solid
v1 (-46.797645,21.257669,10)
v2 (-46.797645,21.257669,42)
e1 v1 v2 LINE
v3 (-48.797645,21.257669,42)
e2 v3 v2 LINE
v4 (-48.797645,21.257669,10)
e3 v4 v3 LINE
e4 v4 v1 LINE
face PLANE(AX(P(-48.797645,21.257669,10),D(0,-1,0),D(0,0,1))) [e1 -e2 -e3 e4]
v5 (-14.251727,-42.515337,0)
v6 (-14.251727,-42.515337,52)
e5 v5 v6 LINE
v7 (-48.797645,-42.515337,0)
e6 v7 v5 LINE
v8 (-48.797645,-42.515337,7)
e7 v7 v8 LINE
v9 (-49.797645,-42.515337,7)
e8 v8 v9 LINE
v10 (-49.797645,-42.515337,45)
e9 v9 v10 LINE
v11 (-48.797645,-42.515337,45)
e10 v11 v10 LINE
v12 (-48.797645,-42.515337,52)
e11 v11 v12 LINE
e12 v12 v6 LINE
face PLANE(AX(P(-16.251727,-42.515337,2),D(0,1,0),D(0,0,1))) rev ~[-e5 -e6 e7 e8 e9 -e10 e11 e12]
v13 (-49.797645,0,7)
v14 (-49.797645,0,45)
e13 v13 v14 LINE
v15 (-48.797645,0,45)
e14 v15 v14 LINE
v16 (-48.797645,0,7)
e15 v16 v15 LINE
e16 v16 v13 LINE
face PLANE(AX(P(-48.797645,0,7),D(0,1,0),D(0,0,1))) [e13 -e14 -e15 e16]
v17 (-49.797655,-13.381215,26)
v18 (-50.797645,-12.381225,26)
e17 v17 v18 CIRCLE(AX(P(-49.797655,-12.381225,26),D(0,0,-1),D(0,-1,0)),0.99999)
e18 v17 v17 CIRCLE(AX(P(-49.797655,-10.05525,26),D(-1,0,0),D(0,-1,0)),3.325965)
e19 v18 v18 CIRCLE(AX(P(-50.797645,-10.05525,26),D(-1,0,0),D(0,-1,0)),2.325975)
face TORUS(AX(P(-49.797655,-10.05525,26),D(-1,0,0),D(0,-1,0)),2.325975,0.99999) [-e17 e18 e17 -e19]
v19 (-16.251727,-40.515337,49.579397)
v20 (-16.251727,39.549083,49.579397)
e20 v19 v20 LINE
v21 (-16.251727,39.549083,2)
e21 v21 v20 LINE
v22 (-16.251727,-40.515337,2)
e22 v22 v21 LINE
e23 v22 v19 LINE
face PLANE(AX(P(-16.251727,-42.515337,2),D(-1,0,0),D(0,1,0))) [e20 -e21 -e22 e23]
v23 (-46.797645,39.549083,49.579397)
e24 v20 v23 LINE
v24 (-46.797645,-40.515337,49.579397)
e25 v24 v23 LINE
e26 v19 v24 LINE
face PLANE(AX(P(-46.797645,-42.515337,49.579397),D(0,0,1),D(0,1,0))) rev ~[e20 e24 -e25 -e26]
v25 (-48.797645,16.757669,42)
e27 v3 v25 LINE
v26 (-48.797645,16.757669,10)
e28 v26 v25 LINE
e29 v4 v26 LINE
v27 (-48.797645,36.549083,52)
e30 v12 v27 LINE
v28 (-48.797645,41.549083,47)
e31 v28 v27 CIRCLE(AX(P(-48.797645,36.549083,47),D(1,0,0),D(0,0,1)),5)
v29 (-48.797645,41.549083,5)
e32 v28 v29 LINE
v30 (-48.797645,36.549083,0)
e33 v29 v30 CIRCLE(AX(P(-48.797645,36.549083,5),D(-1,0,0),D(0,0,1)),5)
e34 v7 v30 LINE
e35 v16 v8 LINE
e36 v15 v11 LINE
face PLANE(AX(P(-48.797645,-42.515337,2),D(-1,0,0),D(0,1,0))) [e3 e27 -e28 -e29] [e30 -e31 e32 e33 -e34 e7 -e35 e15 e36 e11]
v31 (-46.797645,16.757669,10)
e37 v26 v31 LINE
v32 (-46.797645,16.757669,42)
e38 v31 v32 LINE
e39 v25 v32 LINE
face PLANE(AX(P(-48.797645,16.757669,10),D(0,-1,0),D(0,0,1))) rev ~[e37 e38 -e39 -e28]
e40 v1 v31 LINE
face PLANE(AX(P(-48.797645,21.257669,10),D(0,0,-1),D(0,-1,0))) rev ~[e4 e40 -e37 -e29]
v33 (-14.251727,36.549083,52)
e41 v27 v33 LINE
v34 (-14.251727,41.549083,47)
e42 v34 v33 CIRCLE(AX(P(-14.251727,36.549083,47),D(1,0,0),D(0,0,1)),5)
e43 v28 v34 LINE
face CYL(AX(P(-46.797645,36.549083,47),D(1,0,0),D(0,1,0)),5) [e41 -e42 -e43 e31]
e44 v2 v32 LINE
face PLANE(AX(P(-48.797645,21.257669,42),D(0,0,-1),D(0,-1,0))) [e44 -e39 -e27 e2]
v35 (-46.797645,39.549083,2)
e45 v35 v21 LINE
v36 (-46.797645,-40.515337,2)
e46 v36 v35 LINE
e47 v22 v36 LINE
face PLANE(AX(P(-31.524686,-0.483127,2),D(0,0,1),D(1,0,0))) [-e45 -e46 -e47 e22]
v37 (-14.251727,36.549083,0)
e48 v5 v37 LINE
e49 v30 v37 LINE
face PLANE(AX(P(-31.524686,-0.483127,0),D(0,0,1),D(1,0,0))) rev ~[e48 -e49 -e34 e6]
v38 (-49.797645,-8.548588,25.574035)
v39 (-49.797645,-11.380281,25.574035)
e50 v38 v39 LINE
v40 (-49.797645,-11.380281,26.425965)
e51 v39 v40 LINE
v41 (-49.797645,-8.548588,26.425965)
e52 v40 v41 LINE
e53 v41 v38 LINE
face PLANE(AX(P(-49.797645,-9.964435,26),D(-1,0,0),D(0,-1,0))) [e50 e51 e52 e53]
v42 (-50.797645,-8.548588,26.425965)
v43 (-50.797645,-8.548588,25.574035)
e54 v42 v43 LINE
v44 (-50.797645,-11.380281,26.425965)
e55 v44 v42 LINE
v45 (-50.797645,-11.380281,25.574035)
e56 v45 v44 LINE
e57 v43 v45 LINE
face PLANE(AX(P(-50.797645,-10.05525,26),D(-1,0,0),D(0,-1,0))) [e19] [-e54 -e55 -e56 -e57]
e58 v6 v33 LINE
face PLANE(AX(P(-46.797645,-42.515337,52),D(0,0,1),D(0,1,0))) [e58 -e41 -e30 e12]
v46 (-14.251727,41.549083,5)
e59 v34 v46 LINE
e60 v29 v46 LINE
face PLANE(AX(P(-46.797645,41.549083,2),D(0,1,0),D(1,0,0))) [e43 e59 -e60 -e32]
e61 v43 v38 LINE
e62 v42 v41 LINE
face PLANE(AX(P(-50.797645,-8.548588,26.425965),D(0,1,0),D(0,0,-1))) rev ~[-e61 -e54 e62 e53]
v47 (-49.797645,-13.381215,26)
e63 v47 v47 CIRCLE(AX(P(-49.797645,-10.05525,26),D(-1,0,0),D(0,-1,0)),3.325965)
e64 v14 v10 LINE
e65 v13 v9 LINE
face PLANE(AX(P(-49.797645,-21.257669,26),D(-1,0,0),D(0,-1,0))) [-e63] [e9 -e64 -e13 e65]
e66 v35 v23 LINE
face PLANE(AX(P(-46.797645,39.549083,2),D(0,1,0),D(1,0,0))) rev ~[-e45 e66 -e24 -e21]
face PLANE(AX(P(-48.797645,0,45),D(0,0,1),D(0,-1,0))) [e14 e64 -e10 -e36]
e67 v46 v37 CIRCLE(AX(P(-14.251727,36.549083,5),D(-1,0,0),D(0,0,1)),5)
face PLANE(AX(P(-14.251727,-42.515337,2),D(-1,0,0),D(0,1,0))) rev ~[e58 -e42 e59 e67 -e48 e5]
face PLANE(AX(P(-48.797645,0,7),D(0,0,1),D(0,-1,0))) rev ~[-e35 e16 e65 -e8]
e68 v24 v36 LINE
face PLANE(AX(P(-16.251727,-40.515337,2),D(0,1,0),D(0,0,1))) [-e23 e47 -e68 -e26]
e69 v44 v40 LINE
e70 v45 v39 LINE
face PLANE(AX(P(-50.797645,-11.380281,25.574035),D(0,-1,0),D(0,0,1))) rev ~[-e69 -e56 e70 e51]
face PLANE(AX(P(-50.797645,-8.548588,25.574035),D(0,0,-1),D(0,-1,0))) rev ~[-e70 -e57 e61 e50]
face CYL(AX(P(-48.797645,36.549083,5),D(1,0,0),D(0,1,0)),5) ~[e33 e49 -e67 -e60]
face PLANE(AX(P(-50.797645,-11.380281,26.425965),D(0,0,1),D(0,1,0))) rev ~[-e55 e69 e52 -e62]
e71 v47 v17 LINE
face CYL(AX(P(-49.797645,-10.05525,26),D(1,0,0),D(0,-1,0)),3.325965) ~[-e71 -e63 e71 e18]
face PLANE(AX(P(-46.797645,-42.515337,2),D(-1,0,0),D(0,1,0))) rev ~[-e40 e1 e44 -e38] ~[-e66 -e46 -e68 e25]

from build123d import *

# Parameters (mm, degrees)
F0_W      = 34.5459179953
F0_H      = 84.0644203126
F1_DEPTH  = 2
F2_W      = 2
F2_H      = 84.0644203126
F3_DEPTH  = 50
F4_W      = 2
F4_H      = 84.0644203126
F5_DEPTH  = 50
F6_W      = 84.0644203126
F6_H      = 2.4206031561
F7_DEPTH  = 32.2
F8_W      = 30.5459179953
F8_H      = 2
F9_DEPTH  = 47.6
F10_R     = 5
F11_R     = 5
F12_W     = 2
F12_H     = 47.5793968439
F13_DEPTH = 31.3
F14_W     = 4.5
F14_H     = 32
F15_DEPTH = 25
F16_W     = 42.5153374672
F16_H     = 38
F17_DEPTH = 1
F18_R     = 3.3259647968
F19_DEPTH = 1
F20_R     = 0.99999
F22_DEPTH = 1


# Not quite as in the source:
# - a fillet or chamfer is up to 0.001 mm smaller than in the source, because OpenCascade refuses the exact size


with BuildPart() as f1:
    # F0 (on Top) → F1 (new body)
    with BuildSketch(Plane.XY):
        with Locations((-31.5246856771, -0.4831273109)):
            Rectangle(F0_W, F0_H)
    extrude(amount=F1_DEPTH)

    # F2 (on face) → F3 (join)
    with BuildSketch(Plane.XY.offset(2)):
        with Locations((-15.2517266795, -0.4831273109)):
            Rectangle(F2_W, F2_H)
    extrude(amount=F3_DEPTH)

    # F4 (on face) → F5 (join)
    with BuildSketch(Plane.XY.offset(2)):
        with Locations((-47.7976446748, -0.4831273109)):
            Rectangle(F4_W, F4_H)
    extrude(amount=F5_DEPTH)

    # F6 (on face) → F7 (join)
    with BuildSketch(Plane.YZ.offset(-46.7976446748)):
        with Locations((-0.4831273109, 50.789698422)):
            Rectangle(F6_W, F6_H)
    extrude(amount=F7_DEPTH)

    # F8 (on face) → F9 (join)
    with BuildSketch(Plane.XY.offset(2)):
        with Locations((-31.5246856771, 40.5490828454)):
            Rectangle(F8_W, F8_H)
    extrude(amount=F9_DEPTH)

    # F10
    f10_edges = [f1.edges().sort_by_distance(p)[0] for p in [
        (-31.524686, 41.549083, 52),
    ]]
    fillet(f10_edges, radius=F10_R)

    # F11
    f11_edges = [f1.edges().sort_by_distance(p)[0] for p in [
        (-31.524686, 41.549083, 0),
    ]]
    fillet(f11_edges, radius=F11_R)

    # F12 (on face) → F13 (join)
    with BuildSketch(Plane(origin=(-16.2517266795, 0, 0), x_dir=(0, -1, 0), z_dir=(-1, 0, 0))):
        with Locations((41.5153374672, 25.789698422)):
            Rectangle(F12_W, F12_H)
    extrude(amount=F13_DEPTH)

    # F14 (on face) → F15 (cut)
    with BuildSketch(Plane(origin=(-48.7976446748, 0, 0), x_dir=(0, -1, 0), z_dir=(-1, 0, 0))):
        with Locations((-19.0076687336, 26)):
            Rectangle(F14_W, F14_H)
    extrude(amount=-F15_DEPTH, mode=Mode.SUBTRACT)

    # F16 (on face) → F17 (join)
    with BuildSketch(Plane(origin=(-48.7976446748, 0, 0), x_dir=(0, -1, 0), z_dir=(-1, 0, 0))):
        with Locations((21.2576687336, 26)):
            Rectangle(F16_W, F16_H)
    extrude(amount=F17_DEPTH)

    # F18 (on face) → F19 (join)
    with BuildSketch(Plane(origin=(-49.7976446748, 0, 0), x_dir=(0, -1, 0), z_dir=(-1, 0, 0))):
        with Locations((10.0552504882, 26)):
            Circle(F18_R)
    extrude(amount=F19_DEPTH)

    # F20 (radius 1 in the source; OpenCascade refuses exactly that, so slightly less here)
    f20_edges = [f1.edges().sort_by_distance(p)[0] for p in [
        (-50.797645, -6.729286, 26),
    ]]
    fillet(f20_edges, radius=F20_R)

    # F21 (on face) → F22 (cut)
    with BuildSketch(Plane(origin=(-50.7976446748, 0, 0), x_dir=(0, -1, 0), z_dir=(-1, 0, 0))):
        Polygon((11.3802812994, 26.4259647968), (10.0552504882, 26.4259647968), (8.548588492, 26.4259647968), (8.548588492, 25.5740352032), (11.3802812994, 25.5740352032), align=None)
    extrude(amount=-F22_DEPTH, mode=Mode.SUBTRACT)


solid = f1.part
